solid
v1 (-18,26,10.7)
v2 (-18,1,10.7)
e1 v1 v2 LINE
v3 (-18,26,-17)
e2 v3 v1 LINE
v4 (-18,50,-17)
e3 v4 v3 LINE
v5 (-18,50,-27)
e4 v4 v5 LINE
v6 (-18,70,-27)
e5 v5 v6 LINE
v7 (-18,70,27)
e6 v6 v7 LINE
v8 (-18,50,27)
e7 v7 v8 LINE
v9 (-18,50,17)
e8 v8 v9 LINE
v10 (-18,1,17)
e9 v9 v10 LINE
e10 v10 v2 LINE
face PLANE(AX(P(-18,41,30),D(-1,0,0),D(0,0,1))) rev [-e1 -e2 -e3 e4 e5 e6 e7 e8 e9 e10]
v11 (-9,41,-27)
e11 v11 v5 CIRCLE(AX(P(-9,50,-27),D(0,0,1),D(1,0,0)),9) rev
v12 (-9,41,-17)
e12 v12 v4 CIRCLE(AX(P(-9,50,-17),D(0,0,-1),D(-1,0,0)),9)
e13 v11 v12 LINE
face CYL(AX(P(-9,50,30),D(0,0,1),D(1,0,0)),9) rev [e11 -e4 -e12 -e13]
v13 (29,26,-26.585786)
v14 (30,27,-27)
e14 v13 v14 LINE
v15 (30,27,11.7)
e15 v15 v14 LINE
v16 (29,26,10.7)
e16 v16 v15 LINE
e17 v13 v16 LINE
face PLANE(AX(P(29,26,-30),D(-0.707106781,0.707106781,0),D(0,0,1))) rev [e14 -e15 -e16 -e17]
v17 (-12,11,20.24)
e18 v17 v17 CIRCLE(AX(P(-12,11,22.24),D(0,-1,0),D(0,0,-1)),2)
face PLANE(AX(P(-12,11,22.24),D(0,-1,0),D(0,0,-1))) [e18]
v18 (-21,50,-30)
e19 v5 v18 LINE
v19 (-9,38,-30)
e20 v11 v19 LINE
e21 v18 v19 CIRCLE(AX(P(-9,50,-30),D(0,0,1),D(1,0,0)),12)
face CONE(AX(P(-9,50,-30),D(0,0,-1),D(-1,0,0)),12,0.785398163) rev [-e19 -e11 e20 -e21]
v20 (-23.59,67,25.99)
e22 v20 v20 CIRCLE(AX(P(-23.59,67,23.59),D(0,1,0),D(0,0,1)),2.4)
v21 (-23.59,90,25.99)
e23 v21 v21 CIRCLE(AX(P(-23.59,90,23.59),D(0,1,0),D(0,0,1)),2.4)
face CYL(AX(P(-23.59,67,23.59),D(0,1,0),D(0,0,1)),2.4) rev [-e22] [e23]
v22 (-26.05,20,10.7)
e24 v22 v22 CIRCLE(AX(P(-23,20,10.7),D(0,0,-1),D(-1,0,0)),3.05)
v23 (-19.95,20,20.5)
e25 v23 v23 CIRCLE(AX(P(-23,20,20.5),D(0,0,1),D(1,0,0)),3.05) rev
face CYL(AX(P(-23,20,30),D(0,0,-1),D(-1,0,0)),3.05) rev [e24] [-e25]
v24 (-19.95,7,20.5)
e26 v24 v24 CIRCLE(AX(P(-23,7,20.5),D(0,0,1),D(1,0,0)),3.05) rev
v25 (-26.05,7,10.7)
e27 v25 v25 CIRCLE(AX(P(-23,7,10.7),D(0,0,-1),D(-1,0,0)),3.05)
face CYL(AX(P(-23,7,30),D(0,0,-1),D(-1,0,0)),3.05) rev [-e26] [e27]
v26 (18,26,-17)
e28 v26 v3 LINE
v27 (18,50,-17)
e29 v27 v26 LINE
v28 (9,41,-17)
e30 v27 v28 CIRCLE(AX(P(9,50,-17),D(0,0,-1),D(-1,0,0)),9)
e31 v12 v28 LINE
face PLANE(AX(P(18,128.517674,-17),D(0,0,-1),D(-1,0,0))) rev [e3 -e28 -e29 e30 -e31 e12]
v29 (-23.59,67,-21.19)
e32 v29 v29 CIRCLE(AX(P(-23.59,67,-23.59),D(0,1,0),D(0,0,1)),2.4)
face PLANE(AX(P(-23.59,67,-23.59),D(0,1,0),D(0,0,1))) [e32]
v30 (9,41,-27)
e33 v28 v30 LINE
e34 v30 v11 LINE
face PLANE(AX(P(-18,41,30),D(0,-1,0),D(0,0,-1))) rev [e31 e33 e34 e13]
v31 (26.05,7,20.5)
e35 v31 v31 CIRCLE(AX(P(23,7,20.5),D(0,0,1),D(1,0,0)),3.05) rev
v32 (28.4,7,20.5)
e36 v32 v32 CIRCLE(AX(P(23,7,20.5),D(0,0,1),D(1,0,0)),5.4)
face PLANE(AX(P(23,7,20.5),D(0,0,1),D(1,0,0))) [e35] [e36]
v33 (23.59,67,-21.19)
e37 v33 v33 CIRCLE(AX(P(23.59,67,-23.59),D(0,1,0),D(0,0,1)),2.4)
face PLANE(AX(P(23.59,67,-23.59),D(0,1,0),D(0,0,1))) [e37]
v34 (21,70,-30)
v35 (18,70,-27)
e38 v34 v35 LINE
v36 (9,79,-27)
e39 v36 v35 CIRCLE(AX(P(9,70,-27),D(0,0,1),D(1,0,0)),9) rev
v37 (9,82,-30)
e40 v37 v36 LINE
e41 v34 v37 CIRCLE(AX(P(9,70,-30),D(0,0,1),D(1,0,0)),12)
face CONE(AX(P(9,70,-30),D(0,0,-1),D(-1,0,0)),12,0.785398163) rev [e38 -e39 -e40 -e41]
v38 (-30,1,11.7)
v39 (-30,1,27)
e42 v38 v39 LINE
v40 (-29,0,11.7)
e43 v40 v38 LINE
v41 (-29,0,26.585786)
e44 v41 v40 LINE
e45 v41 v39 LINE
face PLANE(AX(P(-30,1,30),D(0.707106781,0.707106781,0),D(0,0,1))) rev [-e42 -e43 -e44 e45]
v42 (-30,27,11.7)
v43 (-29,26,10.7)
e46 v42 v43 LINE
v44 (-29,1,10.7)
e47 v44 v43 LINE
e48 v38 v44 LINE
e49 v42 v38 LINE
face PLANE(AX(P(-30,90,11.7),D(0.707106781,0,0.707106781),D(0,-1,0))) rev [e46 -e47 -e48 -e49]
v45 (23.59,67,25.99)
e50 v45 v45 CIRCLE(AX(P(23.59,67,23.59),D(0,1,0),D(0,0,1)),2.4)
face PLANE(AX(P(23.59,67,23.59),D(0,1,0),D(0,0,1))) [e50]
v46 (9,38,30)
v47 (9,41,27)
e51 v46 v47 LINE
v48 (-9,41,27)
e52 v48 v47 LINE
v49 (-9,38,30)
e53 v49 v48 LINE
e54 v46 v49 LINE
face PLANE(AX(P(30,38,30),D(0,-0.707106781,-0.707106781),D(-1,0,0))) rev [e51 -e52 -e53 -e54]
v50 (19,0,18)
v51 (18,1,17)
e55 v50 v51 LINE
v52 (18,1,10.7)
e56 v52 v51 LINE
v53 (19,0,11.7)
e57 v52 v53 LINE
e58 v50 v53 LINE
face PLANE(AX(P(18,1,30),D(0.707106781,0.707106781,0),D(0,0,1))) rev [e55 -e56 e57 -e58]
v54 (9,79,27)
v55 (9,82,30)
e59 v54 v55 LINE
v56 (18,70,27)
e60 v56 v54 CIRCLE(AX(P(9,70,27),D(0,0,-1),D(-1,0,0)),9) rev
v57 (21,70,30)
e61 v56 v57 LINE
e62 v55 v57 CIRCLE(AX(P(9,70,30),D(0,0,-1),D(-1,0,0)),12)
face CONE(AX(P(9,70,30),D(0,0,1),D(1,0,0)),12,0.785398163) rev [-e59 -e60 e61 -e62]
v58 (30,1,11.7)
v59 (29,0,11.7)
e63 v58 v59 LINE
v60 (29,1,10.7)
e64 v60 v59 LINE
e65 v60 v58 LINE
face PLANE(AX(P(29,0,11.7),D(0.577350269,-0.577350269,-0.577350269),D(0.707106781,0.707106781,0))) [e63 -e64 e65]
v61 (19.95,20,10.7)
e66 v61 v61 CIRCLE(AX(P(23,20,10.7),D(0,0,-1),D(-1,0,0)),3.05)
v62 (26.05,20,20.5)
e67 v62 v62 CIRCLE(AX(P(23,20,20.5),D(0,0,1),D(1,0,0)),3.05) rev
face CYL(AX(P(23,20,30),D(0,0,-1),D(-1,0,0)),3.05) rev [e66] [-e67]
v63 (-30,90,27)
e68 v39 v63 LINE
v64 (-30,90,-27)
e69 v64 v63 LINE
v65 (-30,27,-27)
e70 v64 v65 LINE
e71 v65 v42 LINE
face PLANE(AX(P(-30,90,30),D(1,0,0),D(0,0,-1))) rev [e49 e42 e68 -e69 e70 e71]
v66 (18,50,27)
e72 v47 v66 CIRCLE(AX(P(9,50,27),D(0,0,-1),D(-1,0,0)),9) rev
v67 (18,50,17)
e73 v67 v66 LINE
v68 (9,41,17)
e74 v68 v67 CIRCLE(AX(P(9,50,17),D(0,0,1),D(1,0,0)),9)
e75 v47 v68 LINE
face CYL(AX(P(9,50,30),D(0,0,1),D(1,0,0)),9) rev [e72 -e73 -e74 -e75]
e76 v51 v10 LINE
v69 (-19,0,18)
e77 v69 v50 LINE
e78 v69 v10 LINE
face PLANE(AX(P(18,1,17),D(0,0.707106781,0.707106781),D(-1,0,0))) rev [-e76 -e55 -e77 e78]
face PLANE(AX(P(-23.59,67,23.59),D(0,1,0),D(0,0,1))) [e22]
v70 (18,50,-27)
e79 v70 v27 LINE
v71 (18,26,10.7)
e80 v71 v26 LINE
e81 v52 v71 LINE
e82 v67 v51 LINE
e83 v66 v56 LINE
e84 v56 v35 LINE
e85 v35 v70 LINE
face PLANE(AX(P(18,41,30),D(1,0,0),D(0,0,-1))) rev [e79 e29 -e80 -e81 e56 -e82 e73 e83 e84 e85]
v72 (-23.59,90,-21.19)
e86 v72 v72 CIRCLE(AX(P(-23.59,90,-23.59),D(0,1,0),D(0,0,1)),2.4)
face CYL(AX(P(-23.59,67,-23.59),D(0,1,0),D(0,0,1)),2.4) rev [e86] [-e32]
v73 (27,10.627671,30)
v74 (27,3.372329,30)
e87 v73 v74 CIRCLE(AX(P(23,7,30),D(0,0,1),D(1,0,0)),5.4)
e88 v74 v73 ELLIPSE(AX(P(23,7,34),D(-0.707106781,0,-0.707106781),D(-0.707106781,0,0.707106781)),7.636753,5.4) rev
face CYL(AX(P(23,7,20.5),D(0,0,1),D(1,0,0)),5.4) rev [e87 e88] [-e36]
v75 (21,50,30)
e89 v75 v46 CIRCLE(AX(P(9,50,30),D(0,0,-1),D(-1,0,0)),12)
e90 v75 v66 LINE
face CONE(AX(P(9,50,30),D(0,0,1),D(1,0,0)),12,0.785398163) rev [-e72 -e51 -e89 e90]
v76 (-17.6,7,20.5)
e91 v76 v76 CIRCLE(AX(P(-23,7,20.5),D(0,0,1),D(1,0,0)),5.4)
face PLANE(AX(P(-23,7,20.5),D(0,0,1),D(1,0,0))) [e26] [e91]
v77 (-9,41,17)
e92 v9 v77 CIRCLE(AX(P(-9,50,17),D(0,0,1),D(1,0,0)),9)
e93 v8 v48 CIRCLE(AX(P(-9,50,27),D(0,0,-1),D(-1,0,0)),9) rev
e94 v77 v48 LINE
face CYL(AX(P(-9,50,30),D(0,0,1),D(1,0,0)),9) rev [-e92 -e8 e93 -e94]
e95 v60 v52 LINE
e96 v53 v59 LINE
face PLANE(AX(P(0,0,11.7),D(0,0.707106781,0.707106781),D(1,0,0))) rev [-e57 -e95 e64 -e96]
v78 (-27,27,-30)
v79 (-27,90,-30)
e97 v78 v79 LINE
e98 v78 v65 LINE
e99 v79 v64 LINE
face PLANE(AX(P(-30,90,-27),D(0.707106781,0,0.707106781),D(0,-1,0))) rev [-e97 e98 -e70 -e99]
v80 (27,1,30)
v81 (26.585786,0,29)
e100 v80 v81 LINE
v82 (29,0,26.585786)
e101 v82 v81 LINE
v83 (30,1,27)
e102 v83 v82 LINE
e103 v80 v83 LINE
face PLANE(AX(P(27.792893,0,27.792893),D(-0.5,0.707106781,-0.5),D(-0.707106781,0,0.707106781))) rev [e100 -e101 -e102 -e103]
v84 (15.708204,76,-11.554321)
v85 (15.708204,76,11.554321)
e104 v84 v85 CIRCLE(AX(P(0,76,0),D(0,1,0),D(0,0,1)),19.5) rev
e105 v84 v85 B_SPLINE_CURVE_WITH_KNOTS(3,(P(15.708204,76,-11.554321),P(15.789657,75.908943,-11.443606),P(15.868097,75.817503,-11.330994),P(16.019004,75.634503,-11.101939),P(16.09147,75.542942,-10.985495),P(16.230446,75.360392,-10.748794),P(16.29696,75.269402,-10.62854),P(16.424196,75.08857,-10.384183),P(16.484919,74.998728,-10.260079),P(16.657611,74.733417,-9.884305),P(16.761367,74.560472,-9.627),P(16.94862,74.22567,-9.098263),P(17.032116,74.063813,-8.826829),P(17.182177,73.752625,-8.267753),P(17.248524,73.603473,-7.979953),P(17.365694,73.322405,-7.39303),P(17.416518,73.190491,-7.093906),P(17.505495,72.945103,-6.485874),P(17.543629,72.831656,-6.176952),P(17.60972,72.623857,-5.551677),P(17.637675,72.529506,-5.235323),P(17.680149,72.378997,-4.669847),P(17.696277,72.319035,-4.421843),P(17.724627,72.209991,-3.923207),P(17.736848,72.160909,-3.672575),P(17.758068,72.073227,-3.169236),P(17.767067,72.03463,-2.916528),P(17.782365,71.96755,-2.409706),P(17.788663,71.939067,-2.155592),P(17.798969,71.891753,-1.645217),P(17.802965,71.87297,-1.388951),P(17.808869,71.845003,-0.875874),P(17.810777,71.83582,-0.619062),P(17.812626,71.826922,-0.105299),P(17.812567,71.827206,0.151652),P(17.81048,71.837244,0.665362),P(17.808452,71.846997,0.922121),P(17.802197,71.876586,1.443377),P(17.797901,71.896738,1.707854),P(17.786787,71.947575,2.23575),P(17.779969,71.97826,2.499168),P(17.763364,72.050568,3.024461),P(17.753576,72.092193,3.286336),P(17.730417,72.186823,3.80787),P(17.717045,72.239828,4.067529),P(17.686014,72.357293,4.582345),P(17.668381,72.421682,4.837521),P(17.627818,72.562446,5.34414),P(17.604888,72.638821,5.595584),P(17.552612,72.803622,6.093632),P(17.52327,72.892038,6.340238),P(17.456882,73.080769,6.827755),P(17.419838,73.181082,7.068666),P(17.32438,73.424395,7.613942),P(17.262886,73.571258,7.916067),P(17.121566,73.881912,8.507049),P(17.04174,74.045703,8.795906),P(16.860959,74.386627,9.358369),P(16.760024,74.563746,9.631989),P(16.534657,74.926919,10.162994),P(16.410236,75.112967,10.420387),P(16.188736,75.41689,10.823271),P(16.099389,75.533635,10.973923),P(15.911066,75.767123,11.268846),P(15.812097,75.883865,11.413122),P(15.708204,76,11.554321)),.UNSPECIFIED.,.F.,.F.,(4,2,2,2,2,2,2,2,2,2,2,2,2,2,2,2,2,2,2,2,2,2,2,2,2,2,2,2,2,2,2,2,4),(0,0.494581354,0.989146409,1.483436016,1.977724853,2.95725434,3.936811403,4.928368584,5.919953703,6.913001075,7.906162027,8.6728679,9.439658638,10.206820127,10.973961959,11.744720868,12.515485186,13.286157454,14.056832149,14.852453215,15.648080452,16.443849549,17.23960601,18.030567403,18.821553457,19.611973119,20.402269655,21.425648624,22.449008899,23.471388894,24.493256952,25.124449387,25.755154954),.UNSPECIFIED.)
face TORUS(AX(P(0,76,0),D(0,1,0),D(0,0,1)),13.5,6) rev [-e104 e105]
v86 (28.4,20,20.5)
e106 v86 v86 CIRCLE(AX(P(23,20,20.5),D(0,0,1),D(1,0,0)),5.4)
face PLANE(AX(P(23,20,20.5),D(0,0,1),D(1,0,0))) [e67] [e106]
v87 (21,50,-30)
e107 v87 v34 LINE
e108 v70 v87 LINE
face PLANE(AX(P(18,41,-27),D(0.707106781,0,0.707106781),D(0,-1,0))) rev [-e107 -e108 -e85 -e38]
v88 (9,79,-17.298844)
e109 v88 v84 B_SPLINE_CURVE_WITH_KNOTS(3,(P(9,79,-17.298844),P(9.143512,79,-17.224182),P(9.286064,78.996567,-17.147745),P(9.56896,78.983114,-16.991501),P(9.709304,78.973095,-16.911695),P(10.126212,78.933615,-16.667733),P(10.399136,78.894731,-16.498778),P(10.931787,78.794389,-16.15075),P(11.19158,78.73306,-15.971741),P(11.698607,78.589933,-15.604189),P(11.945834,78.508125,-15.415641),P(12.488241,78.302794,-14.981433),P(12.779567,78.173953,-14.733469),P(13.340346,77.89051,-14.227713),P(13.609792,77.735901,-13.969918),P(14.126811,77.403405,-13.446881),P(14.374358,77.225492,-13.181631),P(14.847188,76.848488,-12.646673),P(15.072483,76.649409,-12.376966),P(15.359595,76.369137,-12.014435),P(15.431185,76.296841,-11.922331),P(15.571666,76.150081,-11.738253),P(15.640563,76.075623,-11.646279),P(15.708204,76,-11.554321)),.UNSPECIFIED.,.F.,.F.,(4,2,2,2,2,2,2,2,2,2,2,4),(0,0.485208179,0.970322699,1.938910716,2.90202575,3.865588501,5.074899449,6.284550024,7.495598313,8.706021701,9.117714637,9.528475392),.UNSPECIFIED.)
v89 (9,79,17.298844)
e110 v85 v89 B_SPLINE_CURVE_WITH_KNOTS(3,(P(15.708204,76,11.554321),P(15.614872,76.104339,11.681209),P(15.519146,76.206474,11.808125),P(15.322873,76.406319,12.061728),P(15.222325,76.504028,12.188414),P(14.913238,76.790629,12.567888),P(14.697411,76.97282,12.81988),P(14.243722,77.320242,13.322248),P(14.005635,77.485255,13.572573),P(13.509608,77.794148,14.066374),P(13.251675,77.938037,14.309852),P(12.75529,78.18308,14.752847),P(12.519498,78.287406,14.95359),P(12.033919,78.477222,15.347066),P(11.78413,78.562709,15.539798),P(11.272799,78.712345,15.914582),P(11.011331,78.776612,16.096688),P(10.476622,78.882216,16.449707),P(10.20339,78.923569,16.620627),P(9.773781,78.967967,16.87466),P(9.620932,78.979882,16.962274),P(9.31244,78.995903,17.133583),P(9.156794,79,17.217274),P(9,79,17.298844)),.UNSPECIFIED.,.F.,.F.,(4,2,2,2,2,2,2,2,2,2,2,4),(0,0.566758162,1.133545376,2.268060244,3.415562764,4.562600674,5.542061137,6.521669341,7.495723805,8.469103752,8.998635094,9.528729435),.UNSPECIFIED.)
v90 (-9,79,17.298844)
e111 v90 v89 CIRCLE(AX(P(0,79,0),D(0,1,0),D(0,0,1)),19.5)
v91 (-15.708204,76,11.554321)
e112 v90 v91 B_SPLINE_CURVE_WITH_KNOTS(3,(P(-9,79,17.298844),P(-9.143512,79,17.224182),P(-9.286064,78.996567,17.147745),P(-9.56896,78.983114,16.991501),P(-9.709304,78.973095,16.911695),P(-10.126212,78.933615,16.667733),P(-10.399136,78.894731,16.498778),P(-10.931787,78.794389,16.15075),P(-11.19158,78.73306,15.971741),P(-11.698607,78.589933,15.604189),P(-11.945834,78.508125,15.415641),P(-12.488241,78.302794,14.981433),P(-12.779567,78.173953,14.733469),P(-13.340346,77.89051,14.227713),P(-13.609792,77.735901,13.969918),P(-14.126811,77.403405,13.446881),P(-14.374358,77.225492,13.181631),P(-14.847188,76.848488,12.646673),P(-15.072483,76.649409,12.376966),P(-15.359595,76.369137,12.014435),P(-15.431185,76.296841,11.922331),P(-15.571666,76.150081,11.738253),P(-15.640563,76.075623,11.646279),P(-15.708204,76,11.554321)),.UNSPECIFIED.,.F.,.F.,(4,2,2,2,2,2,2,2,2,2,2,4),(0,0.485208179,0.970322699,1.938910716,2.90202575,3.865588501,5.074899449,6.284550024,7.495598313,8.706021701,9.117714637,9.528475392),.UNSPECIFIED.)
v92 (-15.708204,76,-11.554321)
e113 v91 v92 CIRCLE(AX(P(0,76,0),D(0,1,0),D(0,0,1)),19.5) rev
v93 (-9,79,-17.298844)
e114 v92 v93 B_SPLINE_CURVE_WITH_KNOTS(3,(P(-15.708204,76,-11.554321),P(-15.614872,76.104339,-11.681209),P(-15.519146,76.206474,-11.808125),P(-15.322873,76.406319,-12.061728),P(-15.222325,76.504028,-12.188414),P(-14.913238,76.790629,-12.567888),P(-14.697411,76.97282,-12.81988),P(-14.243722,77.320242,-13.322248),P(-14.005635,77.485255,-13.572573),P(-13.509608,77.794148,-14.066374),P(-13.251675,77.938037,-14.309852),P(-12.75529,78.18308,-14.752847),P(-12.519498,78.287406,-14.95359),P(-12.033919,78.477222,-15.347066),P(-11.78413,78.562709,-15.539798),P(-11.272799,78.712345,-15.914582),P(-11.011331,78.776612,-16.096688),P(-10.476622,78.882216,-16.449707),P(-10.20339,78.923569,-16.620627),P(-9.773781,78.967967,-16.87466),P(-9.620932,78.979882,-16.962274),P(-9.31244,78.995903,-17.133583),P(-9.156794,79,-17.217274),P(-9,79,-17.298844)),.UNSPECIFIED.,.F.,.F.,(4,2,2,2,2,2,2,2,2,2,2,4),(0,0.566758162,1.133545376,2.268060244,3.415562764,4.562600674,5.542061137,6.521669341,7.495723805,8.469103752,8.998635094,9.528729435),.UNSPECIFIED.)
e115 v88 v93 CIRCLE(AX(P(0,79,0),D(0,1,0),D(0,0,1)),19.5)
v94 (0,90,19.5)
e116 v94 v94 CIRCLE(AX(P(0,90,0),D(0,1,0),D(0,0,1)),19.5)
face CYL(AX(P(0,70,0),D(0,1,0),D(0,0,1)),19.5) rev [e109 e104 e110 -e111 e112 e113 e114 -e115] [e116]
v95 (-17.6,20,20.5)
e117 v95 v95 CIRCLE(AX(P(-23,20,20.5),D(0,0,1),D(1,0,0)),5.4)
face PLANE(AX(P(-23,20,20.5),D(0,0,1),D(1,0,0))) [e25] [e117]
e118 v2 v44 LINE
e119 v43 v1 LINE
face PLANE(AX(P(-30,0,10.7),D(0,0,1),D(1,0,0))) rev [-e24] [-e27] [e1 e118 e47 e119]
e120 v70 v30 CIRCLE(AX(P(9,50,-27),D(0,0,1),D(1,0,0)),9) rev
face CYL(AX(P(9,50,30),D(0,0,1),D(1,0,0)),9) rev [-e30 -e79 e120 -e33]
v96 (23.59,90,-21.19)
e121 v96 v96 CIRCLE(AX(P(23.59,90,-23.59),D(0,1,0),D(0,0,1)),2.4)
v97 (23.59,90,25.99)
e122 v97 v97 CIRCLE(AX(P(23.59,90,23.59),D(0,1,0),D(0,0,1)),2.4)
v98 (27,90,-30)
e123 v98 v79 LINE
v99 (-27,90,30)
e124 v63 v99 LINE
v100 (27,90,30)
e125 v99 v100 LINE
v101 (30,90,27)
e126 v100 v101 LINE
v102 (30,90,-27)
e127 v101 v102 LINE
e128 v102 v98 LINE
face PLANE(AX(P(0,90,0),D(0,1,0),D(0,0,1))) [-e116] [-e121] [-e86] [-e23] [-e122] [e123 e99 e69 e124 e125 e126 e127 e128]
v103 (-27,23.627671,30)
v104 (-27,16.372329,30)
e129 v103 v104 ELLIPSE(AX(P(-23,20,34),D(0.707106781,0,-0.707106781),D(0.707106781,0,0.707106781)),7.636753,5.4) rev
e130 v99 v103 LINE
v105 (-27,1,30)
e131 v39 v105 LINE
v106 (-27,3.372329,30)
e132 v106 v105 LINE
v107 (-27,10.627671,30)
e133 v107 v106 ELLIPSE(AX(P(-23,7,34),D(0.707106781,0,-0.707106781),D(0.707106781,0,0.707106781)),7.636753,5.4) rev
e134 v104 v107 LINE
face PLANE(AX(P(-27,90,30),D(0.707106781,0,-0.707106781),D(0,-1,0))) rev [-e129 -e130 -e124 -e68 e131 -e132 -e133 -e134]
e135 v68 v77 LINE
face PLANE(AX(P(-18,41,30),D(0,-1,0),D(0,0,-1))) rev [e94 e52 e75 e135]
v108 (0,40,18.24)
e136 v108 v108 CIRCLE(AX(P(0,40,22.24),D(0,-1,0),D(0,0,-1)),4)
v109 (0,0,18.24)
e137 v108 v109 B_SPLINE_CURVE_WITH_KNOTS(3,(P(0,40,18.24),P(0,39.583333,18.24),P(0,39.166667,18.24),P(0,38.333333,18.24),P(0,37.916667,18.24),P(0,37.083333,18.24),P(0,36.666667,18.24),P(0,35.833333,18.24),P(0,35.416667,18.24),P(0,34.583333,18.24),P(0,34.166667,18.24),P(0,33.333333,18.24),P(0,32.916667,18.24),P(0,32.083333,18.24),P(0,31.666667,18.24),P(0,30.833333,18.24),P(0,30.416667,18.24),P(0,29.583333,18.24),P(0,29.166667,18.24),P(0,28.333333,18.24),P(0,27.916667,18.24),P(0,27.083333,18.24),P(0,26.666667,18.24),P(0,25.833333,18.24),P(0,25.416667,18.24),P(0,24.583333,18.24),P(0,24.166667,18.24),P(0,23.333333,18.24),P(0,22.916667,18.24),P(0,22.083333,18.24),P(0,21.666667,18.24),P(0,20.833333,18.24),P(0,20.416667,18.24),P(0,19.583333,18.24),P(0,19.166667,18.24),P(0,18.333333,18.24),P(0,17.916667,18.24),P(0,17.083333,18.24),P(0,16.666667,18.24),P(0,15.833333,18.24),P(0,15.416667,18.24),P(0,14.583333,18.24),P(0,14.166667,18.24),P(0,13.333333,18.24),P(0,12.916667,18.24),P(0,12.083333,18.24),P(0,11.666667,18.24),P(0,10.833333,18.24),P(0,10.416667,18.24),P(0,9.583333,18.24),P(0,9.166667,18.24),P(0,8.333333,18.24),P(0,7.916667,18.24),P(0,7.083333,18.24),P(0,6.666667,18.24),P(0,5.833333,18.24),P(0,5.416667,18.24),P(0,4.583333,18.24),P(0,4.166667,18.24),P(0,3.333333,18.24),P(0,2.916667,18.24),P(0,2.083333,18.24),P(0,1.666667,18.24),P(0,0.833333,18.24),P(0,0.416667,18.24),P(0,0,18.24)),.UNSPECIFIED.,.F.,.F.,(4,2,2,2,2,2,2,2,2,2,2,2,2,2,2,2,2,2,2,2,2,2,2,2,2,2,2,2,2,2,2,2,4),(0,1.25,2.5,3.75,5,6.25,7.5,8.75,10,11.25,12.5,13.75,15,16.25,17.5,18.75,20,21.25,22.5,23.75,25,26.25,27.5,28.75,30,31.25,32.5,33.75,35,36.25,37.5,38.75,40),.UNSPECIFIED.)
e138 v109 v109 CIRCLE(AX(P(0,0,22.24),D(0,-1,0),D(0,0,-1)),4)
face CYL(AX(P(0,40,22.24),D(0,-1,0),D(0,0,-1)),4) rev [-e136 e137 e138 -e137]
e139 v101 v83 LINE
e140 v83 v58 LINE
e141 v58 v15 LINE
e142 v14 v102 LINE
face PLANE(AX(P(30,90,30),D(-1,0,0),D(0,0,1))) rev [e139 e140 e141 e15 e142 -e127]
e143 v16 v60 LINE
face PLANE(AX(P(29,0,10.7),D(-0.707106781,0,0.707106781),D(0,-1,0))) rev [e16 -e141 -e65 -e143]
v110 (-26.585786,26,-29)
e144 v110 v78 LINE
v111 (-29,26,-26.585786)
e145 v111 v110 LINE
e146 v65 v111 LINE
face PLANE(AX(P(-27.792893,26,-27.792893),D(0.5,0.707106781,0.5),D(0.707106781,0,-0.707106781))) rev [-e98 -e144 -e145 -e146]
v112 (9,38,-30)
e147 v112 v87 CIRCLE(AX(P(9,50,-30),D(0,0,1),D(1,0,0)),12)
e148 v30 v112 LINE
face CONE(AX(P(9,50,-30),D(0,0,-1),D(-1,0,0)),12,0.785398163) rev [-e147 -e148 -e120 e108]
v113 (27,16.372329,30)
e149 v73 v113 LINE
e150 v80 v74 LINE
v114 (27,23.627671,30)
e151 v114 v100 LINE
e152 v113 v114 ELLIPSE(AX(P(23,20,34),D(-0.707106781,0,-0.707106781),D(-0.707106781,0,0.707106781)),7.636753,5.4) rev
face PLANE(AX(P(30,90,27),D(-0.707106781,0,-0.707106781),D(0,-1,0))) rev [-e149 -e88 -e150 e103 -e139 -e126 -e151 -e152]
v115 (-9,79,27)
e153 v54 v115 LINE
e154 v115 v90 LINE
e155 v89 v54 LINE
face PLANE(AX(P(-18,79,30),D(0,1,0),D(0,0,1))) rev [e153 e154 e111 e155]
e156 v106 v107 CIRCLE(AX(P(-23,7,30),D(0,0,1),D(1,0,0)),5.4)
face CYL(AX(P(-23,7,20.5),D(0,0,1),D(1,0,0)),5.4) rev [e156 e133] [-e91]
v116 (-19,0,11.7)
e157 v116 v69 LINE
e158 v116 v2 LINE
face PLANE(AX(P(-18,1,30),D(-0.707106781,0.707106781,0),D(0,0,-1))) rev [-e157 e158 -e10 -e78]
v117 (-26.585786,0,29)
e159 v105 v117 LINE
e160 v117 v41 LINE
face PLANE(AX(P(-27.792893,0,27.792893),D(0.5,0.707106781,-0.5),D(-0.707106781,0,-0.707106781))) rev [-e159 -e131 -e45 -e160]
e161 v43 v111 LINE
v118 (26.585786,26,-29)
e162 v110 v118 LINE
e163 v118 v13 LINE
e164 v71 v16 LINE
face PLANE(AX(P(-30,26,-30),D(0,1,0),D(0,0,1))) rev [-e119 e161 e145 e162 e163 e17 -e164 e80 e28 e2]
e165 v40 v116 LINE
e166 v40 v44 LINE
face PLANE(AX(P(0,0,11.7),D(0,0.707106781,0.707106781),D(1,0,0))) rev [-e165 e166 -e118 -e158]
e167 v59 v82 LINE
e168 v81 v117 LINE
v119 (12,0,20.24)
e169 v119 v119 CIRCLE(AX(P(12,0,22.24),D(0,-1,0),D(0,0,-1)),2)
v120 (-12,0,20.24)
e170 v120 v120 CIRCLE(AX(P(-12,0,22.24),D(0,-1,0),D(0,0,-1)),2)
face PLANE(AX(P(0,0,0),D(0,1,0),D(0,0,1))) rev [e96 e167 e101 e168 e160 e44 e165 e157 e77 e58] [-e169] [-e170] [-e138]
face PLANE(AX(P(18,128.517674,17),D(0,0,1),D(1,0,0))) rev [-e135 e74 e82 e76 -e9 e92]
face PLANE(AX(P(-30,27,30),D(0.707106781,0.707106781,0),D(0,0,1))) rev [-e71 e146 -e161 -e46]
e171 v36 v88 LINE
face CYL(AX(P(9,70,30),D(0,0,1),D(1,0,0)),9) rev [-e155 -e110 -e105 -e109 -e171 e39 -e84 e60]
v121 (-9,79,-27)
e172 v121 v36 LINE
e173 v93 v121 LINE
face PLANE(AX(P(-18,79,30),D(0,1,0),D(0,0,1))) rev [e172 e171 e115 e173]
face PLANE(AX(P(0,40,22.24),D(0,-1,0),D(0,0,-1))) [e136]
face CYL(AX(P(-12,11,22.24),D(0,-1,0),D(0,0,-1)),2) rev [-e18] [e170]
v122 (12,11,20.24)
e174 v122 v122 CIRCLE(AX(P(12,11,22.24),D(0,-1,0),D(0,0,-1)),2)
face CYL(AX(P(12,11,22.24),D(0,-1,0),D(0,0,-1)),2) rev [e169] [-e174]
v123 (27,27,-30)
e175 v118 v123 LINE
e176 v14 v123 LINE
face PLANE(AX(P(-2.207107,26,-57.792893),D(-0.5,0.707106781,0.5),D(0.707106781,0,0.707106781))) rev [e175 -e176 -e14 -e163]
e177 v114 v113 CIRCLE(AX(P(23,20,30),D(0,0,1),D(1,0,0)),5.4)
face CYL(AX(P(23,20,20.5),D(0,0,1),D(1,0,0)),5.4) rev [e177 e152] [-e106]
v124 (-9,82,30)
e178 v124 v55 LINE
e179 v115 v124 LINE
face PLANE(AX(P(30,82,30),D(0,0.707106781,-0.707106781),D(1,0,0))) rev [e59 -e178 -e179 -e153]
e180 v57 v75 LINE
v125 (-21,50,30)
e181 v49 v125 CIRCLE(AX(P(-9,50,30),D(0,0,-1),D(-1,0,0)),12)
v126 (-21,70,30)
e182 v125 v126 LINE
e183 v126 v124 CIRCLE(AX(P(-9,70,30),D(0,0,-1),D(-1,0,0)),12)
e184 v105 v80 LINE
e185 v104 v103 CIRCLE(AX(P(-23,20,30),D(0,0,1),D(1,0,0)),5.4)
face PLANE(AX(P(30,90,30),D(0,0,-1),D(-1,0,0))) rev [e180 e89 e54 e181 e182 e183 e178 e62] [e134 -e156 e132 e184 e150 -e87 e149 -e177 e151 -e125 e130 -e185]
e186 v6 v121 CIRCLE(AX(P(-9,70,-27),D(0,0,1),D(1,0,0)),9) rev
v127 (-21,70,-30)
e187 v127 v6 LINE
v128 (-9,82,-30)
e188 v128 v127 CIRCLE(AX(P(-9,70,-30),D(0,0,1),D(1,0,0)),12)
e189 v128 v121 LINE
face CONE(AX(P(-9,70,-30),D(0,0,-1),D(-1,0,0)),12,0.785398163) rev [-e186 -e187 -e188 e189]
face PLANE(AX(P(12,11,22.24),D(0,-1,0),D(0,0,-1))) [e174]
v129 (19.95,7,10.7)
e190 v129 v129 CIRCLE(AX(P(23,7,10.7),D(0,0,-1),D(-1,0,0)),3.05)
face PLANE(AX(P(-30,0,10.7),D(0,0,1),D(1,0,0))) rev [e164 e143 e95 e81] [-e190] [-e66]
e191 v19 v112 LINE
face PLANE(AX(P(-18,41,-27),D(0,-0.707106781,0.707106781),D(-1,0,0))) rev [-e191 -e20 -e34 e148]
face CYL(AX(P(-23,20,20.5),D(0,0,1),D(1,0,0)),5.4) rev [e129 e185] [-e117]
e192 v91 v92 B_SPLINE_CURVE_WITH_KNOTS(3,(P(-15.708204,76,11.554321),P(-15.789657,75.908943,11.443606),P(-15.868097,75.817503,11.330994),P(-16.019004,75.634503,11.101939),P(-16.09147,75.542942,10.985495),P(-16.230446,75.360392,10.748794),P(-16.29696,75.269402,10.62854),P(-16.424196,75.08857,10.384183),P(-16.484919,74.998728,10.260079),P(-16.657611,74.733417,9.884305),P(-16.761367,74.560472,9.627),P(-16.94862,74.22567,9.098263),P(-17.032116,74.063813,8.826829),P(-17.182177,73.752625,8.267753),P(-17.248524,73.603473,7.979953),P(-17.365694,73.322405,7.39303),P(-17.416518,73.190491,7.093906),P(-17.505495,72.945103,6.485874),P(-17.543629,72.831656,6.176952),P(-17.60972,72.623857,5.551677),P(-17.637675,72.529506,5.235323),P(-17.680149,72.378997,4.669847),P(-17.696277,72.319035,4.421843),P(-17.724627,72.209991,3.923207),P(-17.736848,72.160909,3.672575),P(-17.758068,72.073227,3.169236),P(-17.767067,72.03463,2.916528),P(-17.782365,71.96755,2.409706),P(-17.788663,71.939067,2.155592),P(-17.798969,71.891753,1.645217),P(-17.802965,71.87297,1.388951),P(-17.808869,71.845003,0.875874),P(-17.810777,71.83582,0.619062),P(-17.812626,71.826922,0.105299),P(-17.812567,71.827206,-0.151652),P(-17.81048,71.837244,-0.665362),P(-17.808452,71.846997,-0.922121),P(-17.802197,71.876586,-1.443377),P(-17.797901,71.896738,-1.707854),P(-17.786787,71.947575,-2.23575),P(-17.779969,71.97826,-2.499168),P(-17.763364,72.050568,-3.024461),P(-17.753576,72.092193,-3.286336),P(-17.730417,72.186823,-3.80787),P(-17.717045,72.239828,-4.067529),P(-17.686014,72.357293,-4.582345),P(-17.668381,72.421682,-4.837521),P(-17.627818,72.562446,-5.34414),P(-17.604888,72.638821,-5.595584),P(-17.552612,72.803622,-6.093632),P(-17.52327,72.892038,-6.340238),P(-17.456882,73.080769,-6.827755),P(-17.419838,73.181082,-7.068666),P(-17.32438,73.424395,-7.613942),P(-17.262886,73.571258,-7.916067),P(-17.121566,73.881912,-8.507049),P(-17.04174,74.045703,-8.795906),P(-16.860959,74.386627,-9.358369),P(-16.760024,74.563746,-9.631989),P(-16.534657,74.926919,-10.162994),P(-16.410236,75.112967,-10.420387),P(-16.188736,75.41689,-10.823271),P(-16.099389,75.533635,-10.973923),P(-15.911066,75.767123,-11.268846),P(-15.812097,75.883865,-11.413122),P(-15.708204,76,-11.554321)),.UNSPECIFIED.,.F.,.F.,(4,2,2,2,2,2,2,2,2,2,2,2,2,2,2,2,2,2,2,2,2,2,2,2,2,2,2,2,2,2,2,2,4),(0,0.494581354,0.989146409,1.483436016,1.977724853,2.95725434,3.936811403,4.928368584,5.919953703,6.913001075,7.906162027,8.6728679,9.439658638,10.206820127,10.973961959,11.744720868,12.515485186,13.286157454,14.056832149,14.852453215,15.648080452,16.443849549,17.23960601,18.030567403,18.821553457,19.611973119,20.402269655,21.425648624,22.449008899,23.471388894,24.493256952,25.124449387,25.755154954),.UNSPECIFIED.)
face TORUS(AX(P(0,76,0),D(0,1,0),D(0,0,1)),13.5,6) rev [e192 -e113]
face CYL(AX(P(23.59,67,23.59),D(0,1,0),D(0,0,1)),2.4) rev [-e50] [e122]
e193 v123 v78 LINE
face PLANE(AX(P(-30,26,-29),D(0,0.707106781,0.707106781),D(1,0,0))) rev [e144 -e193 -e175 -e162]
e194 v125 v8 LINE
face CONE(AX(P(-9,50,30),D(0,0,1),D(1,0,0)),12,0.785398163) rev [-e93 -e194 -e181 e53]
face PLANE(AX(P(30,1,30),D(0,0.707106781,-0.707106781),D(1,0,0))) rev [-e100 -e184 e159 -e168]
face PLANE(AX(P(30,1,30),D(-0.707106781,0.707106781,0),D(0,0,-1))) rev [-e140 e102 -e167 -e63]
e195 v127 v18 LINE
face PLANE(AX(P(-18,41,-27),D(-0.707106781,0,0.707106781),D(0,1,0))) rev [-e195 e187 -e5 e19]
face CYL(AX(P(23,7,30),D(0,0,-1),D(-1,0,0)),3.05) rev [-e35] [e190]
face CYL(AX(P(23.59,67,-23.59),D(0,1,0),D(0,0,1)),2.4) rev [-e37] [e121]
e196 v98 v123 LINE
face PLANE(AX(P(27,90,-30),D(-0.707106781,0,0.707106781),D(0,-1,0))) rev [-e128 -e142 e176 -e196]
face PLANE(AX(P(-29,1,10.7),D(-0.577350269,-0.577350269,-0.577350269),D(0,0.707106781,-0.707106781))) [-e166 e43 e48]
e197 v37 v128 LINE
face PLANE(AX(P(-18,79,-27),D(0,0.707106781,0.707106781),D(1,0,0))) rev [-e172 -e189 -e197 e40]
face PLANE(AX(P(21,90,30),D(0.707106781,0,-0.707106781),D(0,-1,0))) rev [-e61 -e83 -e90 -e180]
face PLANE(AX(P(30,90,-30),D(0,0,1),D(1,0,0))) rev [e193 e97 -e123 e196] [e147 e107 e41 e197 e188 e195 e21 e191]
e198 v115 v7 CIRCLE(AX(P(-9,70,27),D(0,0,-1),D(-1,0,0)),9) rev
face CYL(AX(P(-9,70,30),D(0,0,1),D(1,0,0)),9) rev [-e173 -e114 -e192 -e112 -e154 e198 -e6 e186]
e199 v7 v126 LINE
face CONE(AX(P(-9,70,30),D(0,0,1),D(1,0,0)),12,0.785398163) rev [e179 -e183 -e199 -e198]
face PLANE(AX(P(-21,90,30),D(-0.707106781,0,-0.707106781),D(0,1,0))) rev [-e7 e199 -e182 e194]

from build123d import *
from build123d.topology import SkipClean

# Parameters (mm, degrees)
SKETCH1_W               = 60
SKETCH1_H               = 60
BOSS_EXTRUDE1_DEPTH     = 90
CUT_EXTRUDE1_DEPTH      = 100.498743711
CUT_EXTRUDE1_DEPTH_BACK = 100.498743711
SKETCH2_W               = 40.7
SKETCH2_H               = 26
SKETCH4_W               = 36
SKETCH4_H               = 38
CUT_EXTRUDE2_DEPTH      = 113.249721603
SKETCH5_W               = 36
SKETCH5_H               = 34
CUT_EXTRUDE3_DEPTH      = 79
SKETCH6_R               = 19.5
CUT_EXTRUDE4_DEPTH      = 20
FILLET2_R               = 6
FILLET3_START           = -30
FILLET3_DEPTH           = 60
FILLET3_2_DEPTH         = 13
FILLET3_START_2         = 17
FILLET3_3_DEPTH         = 13
CHAMFER1_SIZE           = 3
SKETCH7_R               = 3.05
CUT_EXTRUDE5_DEPTH      = 104.230276693
SKETCH8_R               = 5.4
CUT_EXTRUDE6_DEPTH      = 9.5
CHAMFER2_SIZE           = 1
SKETCH10_R              = 2.4
CUT_EXTRUDE7_DEPTH      = 23
CHAMFER3_SIZE           = 3
SKETCH11_R              = 4
CUT_EXTRUDE8_DEPTH      = 40
SKETCH12_R              = 2
CUT_EXTRUDE9_DEPTH      = 11


with BuildPart() as part:
    # Sketch1 → Boss-Extrude1 (new body)
    with BuildSketch(Plane(origin=(0, 0, 0), x_dir=(1, 0, 0), z_dir=(0, 1, 0))):
        Rectangle(SKETCH1_W, SKETCH1_H)
    extrude(amount=BOSS_EXTRUDE1_DEPTH)

    # Sketch2 → Cut-Extrude1 (cut, two sides: drawn at the far end of the back side and taken through both)
    with BuildSketch(Plane(origin=(0, 0, 0), x_dir=(0, 0, -1), z_dir=(1, 0, 0)).offset(-CUT_EXTRUDE1_DEPTH_BACK)):
        with Locations((9.65, 13)):
            Rectangle(SKETCH2_W, SKETCH2_H)
    extrude(amount=CUT_EXTRUDE1_DEPTH + CUT_EXTRUDE1_DEPTH_BACK, mode=Mode.SUBTRACT)

    # Sketch4 → Cut-Extrude2 (cut, through all)
    with BuildSketch(Plane(origin=(0, 0, -30), x_dir=(-1, 0, 0), z_dir=(0, 0, -1))):
        with Locations((0, 60)):
            Rectangle(SKETCH4_W, SKETCH4_H)
    extrude(amount=-CUT_EXTRUDE2_DEPTH, mode=Mode.SUBTRACT)

    # Sketch5 → Cut-Extrude3 (cut)
    with BuildSketch(Plane.XZ):
        Rectangle(SKETCH5_W, SKETCH5_H)
    extrude(amount=-CUT_EXTRUDE3_DEPTH, mode=Mode.SUBTRACT)

    # Sketch6 → Cut-Extrude4 (cut)
    with BuildSketch(Plane(origin=(0, 90, 0), x_dir=(1, 0, 0), z_dir=(0, 1, 0))):
        with Locations(Location((0, 0, 0), (0, 0, 270))):
            Circle(SKETCH6_R)
    extrude(amount=-CUT_EXTRUDE4_DEPTH, mode=Mode.SUBTRACT)

    # Fillet2
    # the kernel refuses this fillet: 6 mm, written as the material it adds along each edge
    with BuildSketch(Plane(origin=(0, 70, 0), x_dir=(-0.39557733724118155, 0, -0.9184326705105695), z_dir=(0.9184326705105695, 0, -0.39557733724118155))) as fillet2_piece_1_section:
        with BuildLine():
            CenterArc((19.5 - FILLET2_R, FILLET2_R), FILLET2_R, 270, 90)
            Line((19.5 - FILLET2_R, 0), (19.5, 0))
            Line((19.5, 0), (19.5, FILLET2_R))
        make_face()
    fillet2_piece_1 = revolve(axis=Axis((0, 70, 0), (0, 1, 0)), revolution_arc=133.396028061, mode=Mode.PRIVATE)
    fillet2_piece_1 = split(fillet2_piece_1, bisect_by=Plane(origin=(-18, 70, 0), z_dir=(-1, 0, 0)), keep=Keep.TOP, mode=Mode.PRIVATE)
    add(fillet2_piece_1)
    with BuildSketch(Plane(origin=(0, 70, 0), x_dir=(0.39557733724118166, 0, 0.9184326705105695), z_dir=(-0.9184326705105695, 0, 0.39557733724118166))) as fillet2_piece_2_section:
        with BuildLine():
            CenterArc((19.5 - FILLET2_R, FILLET2_R), FILLET2_R, 270, 90)
            Line((19.5 - FILLET2_R, 0), (19.5, 0))
            Line((19.5, 0), (19.5, FILLET2_R))
        make_face()
    fillet2_piece_2 = revolve(axis=Axis((0, 70, 0), (0, 1, 0)), revolution_arc=133.396028061, mode=Mode.PRIVATE)
    fillet2_piece_2 = split(fillet2_piece_2, bisect_by=Plane(origin=(18, 70, 0), z_dir=(1, 0, 0)), keep=Keep.TOP, mode=Mode.PRIVATE)
    add(fillet2_piece_2)

    # Fillet3: read off the stored shape, not the designer's step
    # Fillet3 outline → Fillet3 (add)
    with BuildSketch(Plane.XY.offset(FILLET3_START)):
        with BuildLine():
            ThreePointArc((-18, 70), (-15.363961031, 76.363961031), (-9, 79))
            Line((-9, 79), (-18, 79))
            Line((-18, 79), (-18, 70))
        make_face()
        with BuildLine():
            Line((18, 79), (9, 79))
            ThreePointArc((9, 79), (15.363961031, 76.363961031), (18, 70))
            Line((18, 70), (18, 79))
        make_face()
    extrude(amount=FILLET3_DEPTH)

    # Fillet3 2 outline → Fillet3 2 (add)
    with BuildSketch(Plane.XY.offset(FILLET3_START)):
        with BuildLine():
            ThreePointArc((-9, 41), (-15.363961031, 43.636038969), (-18, 50))
            Line((-18, 50), (-18, 41))
            Line((-18, 41), (-9, 41))
        make_face()
        with BuildLine():
            Line((18, 41), (18, 50))
            ThreePointArc((18, 50), (15.363961031, 43.636038969), (9, 41))
            Line((9, 41), (18, 41))
        make_face()
    extrude(amount=FILLET3_2_DEPTH)

    # Fillet3 3 outline → Fillet3 3 (add)
    with BuildSketch(Plane.XY.offset(FILLET3_START_2)):
        with BuildLine():
            ThreePointArc((-9, 41), (-15.363961031, 43.636038969), (-18, 50))
            Line((-18, 50), (-18, 41))
            Line((-18, 41), (-9, 41))
        make_face()
        with BuildLine():
            Line((18, 41), (18, 50))
            ThreePointArc((18, 50), (15.363961031, 43.636038969), (9, 41))
            Line((9, 41), (18, 41))
        make_face()
    extrude(amount=FILLET3_3_DEPTH)

    # Fillet3 4 outline → Fillet3 4 (revolve, cut)
    with SkipClean():  # the faces are left unmerged after this step: merging them gives an invalid solid
        with BuildSketch(Plane.XY):
            with BuildLine():
                Line((0, 71.827932396), (17.812058894, 71.827932396))
                ThreePointArc((17.812058894, 71.827932396), (19.062029907, 73.749705949), (19.5, 76))
                Line((19.5, 76), (19.5, 79))
                Line((19.5, 79), (0, 79))
                Line((0, 79), (0, 71.827932396))
            make_face()
        revolve(axis=Axis((0, 0, 0), (0, 1, 0)), mode=Mode.SUBTRACT)
    add(part.part.scale(1), mode=Mode.REPLACE)  # the faces are merged on a copy

    # Chamfer1
    chamfer1_edges = [part.edges().sort_by_distance(p)[0] for p in [
        (-30, 58, -30),
        (30, 58, -30),
        (30, 45, 30),
        (-30, 45, 30),
    ]]
    chamfer(chamfer1_edges, length=CHAMFER1_SIZE)

    # Sketch7 → Cut-Extrude5 (cut, through all)
    with BuildSketch(Plane(origin=(0, 0, 10.7), x_dir=(-1, 0, 0), z_dir=(0, 0, -1))):
        with Locations((-23, 20)):
            Circle(SKETCH7_R)
        with Locations((-23, 7)):
            Circle(SKETCH7_R)
        with Locations((23, 20)):
            Circle(SKETCH7_R)
        with Locations((23, 7)):
            Circle(SKETCH7_R)
    extrude(amount=-CUT_EXTRUDE5_DEPTH, mode=Mode.SUBTRACT)

    # Sketch8 → Cut-Extrude6 (cut)
    with BuildSketch(Plane.XY.offset(30)):
        with Locations((-23, 20)):
            Circle(SKETCH8_R)
        with Locations((23, 20)):
            Circle(SKETCH8_R)
        with Locations((23, 7)):
            Circle(SKETCH8_R)
        with Locations((-23, 7)):
            Circle(SKETCH8_R)
    extrude(amount=-CUT_EXTRUDE6_DEPTH, mode=Mode.SUBTRACT)

    # Chamfer2
    chamfer2_edges = [part.edges().sort_by_distance(p)[0] for p in [
        (-30, 0, 18.85),
        (-30, 26, -8.15),
        (0, 26, -30),
        (30, 26, -8.15),
        (28.5, 26, -28.5),
        (-28.5, 26, -28.5),
        (30, 0, 18.85),
        (0, 0, 30),
        (28.5, 0, 28.5),
        (-28.5, 0, 28.5),
        (-24, 0, 10.7),
        (-30, 13, 10.7),
        (30, 13, 10.7),
        (24, 0, 10.7),
        (-18, 0, 13.85),
        (18, 0, 13.85),
        (0, 0, 17),
    ]]
    chamfer(chamfer2_edges, length=CHAMFER2_SIZE)

    # Sketch10 → Cut-Extrude7 (cut)
    with BuildSketch(Plane(origin=(0, 90, 0), x_dir=(1, 0, 0), z_dir=(0, 1, 0))):
        with Locations(Location((-23.59, 23.59, 0), (0, 0, 270))):
            Circle(SKETCH10_R)
        with Locations(Location((23.59, 23.59, 0), (0, 0, 270))):
            Circle(SKETCH10_R)
        with Locations(Location((23.59, -23.59, 0), (0, 0, 270))):
            Circle(SKETCH10_R)
        with Locations(Location((-23.59, -23.59, 0), (0, 0, 270))):
            Circle(SKETCH10_R)
    extrude(amount=-CUT_EXTRUDE7_DEPTH, mode=Mode.SUBTRACT)

    # Chamfer3
    chamfer3_edges = [part.edges().sort_by_distance(p)[0] for p in [
        (-18, 60, 30),
        (-18, 60, -30),
        (0, 79, 30),
        (18, 60, -30),
        (18, 60, 30),
        (0, 41, 30),
        (0, 41, -30),
        (-15.363961031, 76.363961031, -30),
        (-15.363961031, 76.363961031, 30),
        (15.363961031, 76.363961031, -30),
        (15.363961031, 76.363961031, 30),
        (15.363961031, 43.636038969, 30),
        (15.363961031, 43.636038969, -30),
        (-15.363961031, 43.636038969, -30),
        (-15.363961031, 43.636038969, 30),
        (0, 79, -30),
    ]]
    chamfer(chamfer3_edges, length=CHAMFER3_SIZE)

    # Sketch11 → Cut-Extrude8 (cut)
    with BuildSketch(Plane.XZ):
        with Locations(Location((0, 22.24, 0), (0, 0, 270))):
            Circle(SKETCH11_R)
    extrude(amount=-CUT_EXTRUDE8_DEPTH, mode=Mode.SUBTRACT)

    # Sketch12 → Cut-Extrude9 (cut)
    with BuildSketch(Plane.XZ):
        with Locations(Location((-12, 22.24, 0), (0, 0, 270))):
            Circle(SKETCH12_R)
        with Locations(Location((12, 22.24, 0), (0, 0, 270))):
            Circle(SKETCH12_R)
    extrude(amount=-CUT_EXTRUDE9_DEPTH, mode=Mode.SUBTRACT)


solid = part.part
